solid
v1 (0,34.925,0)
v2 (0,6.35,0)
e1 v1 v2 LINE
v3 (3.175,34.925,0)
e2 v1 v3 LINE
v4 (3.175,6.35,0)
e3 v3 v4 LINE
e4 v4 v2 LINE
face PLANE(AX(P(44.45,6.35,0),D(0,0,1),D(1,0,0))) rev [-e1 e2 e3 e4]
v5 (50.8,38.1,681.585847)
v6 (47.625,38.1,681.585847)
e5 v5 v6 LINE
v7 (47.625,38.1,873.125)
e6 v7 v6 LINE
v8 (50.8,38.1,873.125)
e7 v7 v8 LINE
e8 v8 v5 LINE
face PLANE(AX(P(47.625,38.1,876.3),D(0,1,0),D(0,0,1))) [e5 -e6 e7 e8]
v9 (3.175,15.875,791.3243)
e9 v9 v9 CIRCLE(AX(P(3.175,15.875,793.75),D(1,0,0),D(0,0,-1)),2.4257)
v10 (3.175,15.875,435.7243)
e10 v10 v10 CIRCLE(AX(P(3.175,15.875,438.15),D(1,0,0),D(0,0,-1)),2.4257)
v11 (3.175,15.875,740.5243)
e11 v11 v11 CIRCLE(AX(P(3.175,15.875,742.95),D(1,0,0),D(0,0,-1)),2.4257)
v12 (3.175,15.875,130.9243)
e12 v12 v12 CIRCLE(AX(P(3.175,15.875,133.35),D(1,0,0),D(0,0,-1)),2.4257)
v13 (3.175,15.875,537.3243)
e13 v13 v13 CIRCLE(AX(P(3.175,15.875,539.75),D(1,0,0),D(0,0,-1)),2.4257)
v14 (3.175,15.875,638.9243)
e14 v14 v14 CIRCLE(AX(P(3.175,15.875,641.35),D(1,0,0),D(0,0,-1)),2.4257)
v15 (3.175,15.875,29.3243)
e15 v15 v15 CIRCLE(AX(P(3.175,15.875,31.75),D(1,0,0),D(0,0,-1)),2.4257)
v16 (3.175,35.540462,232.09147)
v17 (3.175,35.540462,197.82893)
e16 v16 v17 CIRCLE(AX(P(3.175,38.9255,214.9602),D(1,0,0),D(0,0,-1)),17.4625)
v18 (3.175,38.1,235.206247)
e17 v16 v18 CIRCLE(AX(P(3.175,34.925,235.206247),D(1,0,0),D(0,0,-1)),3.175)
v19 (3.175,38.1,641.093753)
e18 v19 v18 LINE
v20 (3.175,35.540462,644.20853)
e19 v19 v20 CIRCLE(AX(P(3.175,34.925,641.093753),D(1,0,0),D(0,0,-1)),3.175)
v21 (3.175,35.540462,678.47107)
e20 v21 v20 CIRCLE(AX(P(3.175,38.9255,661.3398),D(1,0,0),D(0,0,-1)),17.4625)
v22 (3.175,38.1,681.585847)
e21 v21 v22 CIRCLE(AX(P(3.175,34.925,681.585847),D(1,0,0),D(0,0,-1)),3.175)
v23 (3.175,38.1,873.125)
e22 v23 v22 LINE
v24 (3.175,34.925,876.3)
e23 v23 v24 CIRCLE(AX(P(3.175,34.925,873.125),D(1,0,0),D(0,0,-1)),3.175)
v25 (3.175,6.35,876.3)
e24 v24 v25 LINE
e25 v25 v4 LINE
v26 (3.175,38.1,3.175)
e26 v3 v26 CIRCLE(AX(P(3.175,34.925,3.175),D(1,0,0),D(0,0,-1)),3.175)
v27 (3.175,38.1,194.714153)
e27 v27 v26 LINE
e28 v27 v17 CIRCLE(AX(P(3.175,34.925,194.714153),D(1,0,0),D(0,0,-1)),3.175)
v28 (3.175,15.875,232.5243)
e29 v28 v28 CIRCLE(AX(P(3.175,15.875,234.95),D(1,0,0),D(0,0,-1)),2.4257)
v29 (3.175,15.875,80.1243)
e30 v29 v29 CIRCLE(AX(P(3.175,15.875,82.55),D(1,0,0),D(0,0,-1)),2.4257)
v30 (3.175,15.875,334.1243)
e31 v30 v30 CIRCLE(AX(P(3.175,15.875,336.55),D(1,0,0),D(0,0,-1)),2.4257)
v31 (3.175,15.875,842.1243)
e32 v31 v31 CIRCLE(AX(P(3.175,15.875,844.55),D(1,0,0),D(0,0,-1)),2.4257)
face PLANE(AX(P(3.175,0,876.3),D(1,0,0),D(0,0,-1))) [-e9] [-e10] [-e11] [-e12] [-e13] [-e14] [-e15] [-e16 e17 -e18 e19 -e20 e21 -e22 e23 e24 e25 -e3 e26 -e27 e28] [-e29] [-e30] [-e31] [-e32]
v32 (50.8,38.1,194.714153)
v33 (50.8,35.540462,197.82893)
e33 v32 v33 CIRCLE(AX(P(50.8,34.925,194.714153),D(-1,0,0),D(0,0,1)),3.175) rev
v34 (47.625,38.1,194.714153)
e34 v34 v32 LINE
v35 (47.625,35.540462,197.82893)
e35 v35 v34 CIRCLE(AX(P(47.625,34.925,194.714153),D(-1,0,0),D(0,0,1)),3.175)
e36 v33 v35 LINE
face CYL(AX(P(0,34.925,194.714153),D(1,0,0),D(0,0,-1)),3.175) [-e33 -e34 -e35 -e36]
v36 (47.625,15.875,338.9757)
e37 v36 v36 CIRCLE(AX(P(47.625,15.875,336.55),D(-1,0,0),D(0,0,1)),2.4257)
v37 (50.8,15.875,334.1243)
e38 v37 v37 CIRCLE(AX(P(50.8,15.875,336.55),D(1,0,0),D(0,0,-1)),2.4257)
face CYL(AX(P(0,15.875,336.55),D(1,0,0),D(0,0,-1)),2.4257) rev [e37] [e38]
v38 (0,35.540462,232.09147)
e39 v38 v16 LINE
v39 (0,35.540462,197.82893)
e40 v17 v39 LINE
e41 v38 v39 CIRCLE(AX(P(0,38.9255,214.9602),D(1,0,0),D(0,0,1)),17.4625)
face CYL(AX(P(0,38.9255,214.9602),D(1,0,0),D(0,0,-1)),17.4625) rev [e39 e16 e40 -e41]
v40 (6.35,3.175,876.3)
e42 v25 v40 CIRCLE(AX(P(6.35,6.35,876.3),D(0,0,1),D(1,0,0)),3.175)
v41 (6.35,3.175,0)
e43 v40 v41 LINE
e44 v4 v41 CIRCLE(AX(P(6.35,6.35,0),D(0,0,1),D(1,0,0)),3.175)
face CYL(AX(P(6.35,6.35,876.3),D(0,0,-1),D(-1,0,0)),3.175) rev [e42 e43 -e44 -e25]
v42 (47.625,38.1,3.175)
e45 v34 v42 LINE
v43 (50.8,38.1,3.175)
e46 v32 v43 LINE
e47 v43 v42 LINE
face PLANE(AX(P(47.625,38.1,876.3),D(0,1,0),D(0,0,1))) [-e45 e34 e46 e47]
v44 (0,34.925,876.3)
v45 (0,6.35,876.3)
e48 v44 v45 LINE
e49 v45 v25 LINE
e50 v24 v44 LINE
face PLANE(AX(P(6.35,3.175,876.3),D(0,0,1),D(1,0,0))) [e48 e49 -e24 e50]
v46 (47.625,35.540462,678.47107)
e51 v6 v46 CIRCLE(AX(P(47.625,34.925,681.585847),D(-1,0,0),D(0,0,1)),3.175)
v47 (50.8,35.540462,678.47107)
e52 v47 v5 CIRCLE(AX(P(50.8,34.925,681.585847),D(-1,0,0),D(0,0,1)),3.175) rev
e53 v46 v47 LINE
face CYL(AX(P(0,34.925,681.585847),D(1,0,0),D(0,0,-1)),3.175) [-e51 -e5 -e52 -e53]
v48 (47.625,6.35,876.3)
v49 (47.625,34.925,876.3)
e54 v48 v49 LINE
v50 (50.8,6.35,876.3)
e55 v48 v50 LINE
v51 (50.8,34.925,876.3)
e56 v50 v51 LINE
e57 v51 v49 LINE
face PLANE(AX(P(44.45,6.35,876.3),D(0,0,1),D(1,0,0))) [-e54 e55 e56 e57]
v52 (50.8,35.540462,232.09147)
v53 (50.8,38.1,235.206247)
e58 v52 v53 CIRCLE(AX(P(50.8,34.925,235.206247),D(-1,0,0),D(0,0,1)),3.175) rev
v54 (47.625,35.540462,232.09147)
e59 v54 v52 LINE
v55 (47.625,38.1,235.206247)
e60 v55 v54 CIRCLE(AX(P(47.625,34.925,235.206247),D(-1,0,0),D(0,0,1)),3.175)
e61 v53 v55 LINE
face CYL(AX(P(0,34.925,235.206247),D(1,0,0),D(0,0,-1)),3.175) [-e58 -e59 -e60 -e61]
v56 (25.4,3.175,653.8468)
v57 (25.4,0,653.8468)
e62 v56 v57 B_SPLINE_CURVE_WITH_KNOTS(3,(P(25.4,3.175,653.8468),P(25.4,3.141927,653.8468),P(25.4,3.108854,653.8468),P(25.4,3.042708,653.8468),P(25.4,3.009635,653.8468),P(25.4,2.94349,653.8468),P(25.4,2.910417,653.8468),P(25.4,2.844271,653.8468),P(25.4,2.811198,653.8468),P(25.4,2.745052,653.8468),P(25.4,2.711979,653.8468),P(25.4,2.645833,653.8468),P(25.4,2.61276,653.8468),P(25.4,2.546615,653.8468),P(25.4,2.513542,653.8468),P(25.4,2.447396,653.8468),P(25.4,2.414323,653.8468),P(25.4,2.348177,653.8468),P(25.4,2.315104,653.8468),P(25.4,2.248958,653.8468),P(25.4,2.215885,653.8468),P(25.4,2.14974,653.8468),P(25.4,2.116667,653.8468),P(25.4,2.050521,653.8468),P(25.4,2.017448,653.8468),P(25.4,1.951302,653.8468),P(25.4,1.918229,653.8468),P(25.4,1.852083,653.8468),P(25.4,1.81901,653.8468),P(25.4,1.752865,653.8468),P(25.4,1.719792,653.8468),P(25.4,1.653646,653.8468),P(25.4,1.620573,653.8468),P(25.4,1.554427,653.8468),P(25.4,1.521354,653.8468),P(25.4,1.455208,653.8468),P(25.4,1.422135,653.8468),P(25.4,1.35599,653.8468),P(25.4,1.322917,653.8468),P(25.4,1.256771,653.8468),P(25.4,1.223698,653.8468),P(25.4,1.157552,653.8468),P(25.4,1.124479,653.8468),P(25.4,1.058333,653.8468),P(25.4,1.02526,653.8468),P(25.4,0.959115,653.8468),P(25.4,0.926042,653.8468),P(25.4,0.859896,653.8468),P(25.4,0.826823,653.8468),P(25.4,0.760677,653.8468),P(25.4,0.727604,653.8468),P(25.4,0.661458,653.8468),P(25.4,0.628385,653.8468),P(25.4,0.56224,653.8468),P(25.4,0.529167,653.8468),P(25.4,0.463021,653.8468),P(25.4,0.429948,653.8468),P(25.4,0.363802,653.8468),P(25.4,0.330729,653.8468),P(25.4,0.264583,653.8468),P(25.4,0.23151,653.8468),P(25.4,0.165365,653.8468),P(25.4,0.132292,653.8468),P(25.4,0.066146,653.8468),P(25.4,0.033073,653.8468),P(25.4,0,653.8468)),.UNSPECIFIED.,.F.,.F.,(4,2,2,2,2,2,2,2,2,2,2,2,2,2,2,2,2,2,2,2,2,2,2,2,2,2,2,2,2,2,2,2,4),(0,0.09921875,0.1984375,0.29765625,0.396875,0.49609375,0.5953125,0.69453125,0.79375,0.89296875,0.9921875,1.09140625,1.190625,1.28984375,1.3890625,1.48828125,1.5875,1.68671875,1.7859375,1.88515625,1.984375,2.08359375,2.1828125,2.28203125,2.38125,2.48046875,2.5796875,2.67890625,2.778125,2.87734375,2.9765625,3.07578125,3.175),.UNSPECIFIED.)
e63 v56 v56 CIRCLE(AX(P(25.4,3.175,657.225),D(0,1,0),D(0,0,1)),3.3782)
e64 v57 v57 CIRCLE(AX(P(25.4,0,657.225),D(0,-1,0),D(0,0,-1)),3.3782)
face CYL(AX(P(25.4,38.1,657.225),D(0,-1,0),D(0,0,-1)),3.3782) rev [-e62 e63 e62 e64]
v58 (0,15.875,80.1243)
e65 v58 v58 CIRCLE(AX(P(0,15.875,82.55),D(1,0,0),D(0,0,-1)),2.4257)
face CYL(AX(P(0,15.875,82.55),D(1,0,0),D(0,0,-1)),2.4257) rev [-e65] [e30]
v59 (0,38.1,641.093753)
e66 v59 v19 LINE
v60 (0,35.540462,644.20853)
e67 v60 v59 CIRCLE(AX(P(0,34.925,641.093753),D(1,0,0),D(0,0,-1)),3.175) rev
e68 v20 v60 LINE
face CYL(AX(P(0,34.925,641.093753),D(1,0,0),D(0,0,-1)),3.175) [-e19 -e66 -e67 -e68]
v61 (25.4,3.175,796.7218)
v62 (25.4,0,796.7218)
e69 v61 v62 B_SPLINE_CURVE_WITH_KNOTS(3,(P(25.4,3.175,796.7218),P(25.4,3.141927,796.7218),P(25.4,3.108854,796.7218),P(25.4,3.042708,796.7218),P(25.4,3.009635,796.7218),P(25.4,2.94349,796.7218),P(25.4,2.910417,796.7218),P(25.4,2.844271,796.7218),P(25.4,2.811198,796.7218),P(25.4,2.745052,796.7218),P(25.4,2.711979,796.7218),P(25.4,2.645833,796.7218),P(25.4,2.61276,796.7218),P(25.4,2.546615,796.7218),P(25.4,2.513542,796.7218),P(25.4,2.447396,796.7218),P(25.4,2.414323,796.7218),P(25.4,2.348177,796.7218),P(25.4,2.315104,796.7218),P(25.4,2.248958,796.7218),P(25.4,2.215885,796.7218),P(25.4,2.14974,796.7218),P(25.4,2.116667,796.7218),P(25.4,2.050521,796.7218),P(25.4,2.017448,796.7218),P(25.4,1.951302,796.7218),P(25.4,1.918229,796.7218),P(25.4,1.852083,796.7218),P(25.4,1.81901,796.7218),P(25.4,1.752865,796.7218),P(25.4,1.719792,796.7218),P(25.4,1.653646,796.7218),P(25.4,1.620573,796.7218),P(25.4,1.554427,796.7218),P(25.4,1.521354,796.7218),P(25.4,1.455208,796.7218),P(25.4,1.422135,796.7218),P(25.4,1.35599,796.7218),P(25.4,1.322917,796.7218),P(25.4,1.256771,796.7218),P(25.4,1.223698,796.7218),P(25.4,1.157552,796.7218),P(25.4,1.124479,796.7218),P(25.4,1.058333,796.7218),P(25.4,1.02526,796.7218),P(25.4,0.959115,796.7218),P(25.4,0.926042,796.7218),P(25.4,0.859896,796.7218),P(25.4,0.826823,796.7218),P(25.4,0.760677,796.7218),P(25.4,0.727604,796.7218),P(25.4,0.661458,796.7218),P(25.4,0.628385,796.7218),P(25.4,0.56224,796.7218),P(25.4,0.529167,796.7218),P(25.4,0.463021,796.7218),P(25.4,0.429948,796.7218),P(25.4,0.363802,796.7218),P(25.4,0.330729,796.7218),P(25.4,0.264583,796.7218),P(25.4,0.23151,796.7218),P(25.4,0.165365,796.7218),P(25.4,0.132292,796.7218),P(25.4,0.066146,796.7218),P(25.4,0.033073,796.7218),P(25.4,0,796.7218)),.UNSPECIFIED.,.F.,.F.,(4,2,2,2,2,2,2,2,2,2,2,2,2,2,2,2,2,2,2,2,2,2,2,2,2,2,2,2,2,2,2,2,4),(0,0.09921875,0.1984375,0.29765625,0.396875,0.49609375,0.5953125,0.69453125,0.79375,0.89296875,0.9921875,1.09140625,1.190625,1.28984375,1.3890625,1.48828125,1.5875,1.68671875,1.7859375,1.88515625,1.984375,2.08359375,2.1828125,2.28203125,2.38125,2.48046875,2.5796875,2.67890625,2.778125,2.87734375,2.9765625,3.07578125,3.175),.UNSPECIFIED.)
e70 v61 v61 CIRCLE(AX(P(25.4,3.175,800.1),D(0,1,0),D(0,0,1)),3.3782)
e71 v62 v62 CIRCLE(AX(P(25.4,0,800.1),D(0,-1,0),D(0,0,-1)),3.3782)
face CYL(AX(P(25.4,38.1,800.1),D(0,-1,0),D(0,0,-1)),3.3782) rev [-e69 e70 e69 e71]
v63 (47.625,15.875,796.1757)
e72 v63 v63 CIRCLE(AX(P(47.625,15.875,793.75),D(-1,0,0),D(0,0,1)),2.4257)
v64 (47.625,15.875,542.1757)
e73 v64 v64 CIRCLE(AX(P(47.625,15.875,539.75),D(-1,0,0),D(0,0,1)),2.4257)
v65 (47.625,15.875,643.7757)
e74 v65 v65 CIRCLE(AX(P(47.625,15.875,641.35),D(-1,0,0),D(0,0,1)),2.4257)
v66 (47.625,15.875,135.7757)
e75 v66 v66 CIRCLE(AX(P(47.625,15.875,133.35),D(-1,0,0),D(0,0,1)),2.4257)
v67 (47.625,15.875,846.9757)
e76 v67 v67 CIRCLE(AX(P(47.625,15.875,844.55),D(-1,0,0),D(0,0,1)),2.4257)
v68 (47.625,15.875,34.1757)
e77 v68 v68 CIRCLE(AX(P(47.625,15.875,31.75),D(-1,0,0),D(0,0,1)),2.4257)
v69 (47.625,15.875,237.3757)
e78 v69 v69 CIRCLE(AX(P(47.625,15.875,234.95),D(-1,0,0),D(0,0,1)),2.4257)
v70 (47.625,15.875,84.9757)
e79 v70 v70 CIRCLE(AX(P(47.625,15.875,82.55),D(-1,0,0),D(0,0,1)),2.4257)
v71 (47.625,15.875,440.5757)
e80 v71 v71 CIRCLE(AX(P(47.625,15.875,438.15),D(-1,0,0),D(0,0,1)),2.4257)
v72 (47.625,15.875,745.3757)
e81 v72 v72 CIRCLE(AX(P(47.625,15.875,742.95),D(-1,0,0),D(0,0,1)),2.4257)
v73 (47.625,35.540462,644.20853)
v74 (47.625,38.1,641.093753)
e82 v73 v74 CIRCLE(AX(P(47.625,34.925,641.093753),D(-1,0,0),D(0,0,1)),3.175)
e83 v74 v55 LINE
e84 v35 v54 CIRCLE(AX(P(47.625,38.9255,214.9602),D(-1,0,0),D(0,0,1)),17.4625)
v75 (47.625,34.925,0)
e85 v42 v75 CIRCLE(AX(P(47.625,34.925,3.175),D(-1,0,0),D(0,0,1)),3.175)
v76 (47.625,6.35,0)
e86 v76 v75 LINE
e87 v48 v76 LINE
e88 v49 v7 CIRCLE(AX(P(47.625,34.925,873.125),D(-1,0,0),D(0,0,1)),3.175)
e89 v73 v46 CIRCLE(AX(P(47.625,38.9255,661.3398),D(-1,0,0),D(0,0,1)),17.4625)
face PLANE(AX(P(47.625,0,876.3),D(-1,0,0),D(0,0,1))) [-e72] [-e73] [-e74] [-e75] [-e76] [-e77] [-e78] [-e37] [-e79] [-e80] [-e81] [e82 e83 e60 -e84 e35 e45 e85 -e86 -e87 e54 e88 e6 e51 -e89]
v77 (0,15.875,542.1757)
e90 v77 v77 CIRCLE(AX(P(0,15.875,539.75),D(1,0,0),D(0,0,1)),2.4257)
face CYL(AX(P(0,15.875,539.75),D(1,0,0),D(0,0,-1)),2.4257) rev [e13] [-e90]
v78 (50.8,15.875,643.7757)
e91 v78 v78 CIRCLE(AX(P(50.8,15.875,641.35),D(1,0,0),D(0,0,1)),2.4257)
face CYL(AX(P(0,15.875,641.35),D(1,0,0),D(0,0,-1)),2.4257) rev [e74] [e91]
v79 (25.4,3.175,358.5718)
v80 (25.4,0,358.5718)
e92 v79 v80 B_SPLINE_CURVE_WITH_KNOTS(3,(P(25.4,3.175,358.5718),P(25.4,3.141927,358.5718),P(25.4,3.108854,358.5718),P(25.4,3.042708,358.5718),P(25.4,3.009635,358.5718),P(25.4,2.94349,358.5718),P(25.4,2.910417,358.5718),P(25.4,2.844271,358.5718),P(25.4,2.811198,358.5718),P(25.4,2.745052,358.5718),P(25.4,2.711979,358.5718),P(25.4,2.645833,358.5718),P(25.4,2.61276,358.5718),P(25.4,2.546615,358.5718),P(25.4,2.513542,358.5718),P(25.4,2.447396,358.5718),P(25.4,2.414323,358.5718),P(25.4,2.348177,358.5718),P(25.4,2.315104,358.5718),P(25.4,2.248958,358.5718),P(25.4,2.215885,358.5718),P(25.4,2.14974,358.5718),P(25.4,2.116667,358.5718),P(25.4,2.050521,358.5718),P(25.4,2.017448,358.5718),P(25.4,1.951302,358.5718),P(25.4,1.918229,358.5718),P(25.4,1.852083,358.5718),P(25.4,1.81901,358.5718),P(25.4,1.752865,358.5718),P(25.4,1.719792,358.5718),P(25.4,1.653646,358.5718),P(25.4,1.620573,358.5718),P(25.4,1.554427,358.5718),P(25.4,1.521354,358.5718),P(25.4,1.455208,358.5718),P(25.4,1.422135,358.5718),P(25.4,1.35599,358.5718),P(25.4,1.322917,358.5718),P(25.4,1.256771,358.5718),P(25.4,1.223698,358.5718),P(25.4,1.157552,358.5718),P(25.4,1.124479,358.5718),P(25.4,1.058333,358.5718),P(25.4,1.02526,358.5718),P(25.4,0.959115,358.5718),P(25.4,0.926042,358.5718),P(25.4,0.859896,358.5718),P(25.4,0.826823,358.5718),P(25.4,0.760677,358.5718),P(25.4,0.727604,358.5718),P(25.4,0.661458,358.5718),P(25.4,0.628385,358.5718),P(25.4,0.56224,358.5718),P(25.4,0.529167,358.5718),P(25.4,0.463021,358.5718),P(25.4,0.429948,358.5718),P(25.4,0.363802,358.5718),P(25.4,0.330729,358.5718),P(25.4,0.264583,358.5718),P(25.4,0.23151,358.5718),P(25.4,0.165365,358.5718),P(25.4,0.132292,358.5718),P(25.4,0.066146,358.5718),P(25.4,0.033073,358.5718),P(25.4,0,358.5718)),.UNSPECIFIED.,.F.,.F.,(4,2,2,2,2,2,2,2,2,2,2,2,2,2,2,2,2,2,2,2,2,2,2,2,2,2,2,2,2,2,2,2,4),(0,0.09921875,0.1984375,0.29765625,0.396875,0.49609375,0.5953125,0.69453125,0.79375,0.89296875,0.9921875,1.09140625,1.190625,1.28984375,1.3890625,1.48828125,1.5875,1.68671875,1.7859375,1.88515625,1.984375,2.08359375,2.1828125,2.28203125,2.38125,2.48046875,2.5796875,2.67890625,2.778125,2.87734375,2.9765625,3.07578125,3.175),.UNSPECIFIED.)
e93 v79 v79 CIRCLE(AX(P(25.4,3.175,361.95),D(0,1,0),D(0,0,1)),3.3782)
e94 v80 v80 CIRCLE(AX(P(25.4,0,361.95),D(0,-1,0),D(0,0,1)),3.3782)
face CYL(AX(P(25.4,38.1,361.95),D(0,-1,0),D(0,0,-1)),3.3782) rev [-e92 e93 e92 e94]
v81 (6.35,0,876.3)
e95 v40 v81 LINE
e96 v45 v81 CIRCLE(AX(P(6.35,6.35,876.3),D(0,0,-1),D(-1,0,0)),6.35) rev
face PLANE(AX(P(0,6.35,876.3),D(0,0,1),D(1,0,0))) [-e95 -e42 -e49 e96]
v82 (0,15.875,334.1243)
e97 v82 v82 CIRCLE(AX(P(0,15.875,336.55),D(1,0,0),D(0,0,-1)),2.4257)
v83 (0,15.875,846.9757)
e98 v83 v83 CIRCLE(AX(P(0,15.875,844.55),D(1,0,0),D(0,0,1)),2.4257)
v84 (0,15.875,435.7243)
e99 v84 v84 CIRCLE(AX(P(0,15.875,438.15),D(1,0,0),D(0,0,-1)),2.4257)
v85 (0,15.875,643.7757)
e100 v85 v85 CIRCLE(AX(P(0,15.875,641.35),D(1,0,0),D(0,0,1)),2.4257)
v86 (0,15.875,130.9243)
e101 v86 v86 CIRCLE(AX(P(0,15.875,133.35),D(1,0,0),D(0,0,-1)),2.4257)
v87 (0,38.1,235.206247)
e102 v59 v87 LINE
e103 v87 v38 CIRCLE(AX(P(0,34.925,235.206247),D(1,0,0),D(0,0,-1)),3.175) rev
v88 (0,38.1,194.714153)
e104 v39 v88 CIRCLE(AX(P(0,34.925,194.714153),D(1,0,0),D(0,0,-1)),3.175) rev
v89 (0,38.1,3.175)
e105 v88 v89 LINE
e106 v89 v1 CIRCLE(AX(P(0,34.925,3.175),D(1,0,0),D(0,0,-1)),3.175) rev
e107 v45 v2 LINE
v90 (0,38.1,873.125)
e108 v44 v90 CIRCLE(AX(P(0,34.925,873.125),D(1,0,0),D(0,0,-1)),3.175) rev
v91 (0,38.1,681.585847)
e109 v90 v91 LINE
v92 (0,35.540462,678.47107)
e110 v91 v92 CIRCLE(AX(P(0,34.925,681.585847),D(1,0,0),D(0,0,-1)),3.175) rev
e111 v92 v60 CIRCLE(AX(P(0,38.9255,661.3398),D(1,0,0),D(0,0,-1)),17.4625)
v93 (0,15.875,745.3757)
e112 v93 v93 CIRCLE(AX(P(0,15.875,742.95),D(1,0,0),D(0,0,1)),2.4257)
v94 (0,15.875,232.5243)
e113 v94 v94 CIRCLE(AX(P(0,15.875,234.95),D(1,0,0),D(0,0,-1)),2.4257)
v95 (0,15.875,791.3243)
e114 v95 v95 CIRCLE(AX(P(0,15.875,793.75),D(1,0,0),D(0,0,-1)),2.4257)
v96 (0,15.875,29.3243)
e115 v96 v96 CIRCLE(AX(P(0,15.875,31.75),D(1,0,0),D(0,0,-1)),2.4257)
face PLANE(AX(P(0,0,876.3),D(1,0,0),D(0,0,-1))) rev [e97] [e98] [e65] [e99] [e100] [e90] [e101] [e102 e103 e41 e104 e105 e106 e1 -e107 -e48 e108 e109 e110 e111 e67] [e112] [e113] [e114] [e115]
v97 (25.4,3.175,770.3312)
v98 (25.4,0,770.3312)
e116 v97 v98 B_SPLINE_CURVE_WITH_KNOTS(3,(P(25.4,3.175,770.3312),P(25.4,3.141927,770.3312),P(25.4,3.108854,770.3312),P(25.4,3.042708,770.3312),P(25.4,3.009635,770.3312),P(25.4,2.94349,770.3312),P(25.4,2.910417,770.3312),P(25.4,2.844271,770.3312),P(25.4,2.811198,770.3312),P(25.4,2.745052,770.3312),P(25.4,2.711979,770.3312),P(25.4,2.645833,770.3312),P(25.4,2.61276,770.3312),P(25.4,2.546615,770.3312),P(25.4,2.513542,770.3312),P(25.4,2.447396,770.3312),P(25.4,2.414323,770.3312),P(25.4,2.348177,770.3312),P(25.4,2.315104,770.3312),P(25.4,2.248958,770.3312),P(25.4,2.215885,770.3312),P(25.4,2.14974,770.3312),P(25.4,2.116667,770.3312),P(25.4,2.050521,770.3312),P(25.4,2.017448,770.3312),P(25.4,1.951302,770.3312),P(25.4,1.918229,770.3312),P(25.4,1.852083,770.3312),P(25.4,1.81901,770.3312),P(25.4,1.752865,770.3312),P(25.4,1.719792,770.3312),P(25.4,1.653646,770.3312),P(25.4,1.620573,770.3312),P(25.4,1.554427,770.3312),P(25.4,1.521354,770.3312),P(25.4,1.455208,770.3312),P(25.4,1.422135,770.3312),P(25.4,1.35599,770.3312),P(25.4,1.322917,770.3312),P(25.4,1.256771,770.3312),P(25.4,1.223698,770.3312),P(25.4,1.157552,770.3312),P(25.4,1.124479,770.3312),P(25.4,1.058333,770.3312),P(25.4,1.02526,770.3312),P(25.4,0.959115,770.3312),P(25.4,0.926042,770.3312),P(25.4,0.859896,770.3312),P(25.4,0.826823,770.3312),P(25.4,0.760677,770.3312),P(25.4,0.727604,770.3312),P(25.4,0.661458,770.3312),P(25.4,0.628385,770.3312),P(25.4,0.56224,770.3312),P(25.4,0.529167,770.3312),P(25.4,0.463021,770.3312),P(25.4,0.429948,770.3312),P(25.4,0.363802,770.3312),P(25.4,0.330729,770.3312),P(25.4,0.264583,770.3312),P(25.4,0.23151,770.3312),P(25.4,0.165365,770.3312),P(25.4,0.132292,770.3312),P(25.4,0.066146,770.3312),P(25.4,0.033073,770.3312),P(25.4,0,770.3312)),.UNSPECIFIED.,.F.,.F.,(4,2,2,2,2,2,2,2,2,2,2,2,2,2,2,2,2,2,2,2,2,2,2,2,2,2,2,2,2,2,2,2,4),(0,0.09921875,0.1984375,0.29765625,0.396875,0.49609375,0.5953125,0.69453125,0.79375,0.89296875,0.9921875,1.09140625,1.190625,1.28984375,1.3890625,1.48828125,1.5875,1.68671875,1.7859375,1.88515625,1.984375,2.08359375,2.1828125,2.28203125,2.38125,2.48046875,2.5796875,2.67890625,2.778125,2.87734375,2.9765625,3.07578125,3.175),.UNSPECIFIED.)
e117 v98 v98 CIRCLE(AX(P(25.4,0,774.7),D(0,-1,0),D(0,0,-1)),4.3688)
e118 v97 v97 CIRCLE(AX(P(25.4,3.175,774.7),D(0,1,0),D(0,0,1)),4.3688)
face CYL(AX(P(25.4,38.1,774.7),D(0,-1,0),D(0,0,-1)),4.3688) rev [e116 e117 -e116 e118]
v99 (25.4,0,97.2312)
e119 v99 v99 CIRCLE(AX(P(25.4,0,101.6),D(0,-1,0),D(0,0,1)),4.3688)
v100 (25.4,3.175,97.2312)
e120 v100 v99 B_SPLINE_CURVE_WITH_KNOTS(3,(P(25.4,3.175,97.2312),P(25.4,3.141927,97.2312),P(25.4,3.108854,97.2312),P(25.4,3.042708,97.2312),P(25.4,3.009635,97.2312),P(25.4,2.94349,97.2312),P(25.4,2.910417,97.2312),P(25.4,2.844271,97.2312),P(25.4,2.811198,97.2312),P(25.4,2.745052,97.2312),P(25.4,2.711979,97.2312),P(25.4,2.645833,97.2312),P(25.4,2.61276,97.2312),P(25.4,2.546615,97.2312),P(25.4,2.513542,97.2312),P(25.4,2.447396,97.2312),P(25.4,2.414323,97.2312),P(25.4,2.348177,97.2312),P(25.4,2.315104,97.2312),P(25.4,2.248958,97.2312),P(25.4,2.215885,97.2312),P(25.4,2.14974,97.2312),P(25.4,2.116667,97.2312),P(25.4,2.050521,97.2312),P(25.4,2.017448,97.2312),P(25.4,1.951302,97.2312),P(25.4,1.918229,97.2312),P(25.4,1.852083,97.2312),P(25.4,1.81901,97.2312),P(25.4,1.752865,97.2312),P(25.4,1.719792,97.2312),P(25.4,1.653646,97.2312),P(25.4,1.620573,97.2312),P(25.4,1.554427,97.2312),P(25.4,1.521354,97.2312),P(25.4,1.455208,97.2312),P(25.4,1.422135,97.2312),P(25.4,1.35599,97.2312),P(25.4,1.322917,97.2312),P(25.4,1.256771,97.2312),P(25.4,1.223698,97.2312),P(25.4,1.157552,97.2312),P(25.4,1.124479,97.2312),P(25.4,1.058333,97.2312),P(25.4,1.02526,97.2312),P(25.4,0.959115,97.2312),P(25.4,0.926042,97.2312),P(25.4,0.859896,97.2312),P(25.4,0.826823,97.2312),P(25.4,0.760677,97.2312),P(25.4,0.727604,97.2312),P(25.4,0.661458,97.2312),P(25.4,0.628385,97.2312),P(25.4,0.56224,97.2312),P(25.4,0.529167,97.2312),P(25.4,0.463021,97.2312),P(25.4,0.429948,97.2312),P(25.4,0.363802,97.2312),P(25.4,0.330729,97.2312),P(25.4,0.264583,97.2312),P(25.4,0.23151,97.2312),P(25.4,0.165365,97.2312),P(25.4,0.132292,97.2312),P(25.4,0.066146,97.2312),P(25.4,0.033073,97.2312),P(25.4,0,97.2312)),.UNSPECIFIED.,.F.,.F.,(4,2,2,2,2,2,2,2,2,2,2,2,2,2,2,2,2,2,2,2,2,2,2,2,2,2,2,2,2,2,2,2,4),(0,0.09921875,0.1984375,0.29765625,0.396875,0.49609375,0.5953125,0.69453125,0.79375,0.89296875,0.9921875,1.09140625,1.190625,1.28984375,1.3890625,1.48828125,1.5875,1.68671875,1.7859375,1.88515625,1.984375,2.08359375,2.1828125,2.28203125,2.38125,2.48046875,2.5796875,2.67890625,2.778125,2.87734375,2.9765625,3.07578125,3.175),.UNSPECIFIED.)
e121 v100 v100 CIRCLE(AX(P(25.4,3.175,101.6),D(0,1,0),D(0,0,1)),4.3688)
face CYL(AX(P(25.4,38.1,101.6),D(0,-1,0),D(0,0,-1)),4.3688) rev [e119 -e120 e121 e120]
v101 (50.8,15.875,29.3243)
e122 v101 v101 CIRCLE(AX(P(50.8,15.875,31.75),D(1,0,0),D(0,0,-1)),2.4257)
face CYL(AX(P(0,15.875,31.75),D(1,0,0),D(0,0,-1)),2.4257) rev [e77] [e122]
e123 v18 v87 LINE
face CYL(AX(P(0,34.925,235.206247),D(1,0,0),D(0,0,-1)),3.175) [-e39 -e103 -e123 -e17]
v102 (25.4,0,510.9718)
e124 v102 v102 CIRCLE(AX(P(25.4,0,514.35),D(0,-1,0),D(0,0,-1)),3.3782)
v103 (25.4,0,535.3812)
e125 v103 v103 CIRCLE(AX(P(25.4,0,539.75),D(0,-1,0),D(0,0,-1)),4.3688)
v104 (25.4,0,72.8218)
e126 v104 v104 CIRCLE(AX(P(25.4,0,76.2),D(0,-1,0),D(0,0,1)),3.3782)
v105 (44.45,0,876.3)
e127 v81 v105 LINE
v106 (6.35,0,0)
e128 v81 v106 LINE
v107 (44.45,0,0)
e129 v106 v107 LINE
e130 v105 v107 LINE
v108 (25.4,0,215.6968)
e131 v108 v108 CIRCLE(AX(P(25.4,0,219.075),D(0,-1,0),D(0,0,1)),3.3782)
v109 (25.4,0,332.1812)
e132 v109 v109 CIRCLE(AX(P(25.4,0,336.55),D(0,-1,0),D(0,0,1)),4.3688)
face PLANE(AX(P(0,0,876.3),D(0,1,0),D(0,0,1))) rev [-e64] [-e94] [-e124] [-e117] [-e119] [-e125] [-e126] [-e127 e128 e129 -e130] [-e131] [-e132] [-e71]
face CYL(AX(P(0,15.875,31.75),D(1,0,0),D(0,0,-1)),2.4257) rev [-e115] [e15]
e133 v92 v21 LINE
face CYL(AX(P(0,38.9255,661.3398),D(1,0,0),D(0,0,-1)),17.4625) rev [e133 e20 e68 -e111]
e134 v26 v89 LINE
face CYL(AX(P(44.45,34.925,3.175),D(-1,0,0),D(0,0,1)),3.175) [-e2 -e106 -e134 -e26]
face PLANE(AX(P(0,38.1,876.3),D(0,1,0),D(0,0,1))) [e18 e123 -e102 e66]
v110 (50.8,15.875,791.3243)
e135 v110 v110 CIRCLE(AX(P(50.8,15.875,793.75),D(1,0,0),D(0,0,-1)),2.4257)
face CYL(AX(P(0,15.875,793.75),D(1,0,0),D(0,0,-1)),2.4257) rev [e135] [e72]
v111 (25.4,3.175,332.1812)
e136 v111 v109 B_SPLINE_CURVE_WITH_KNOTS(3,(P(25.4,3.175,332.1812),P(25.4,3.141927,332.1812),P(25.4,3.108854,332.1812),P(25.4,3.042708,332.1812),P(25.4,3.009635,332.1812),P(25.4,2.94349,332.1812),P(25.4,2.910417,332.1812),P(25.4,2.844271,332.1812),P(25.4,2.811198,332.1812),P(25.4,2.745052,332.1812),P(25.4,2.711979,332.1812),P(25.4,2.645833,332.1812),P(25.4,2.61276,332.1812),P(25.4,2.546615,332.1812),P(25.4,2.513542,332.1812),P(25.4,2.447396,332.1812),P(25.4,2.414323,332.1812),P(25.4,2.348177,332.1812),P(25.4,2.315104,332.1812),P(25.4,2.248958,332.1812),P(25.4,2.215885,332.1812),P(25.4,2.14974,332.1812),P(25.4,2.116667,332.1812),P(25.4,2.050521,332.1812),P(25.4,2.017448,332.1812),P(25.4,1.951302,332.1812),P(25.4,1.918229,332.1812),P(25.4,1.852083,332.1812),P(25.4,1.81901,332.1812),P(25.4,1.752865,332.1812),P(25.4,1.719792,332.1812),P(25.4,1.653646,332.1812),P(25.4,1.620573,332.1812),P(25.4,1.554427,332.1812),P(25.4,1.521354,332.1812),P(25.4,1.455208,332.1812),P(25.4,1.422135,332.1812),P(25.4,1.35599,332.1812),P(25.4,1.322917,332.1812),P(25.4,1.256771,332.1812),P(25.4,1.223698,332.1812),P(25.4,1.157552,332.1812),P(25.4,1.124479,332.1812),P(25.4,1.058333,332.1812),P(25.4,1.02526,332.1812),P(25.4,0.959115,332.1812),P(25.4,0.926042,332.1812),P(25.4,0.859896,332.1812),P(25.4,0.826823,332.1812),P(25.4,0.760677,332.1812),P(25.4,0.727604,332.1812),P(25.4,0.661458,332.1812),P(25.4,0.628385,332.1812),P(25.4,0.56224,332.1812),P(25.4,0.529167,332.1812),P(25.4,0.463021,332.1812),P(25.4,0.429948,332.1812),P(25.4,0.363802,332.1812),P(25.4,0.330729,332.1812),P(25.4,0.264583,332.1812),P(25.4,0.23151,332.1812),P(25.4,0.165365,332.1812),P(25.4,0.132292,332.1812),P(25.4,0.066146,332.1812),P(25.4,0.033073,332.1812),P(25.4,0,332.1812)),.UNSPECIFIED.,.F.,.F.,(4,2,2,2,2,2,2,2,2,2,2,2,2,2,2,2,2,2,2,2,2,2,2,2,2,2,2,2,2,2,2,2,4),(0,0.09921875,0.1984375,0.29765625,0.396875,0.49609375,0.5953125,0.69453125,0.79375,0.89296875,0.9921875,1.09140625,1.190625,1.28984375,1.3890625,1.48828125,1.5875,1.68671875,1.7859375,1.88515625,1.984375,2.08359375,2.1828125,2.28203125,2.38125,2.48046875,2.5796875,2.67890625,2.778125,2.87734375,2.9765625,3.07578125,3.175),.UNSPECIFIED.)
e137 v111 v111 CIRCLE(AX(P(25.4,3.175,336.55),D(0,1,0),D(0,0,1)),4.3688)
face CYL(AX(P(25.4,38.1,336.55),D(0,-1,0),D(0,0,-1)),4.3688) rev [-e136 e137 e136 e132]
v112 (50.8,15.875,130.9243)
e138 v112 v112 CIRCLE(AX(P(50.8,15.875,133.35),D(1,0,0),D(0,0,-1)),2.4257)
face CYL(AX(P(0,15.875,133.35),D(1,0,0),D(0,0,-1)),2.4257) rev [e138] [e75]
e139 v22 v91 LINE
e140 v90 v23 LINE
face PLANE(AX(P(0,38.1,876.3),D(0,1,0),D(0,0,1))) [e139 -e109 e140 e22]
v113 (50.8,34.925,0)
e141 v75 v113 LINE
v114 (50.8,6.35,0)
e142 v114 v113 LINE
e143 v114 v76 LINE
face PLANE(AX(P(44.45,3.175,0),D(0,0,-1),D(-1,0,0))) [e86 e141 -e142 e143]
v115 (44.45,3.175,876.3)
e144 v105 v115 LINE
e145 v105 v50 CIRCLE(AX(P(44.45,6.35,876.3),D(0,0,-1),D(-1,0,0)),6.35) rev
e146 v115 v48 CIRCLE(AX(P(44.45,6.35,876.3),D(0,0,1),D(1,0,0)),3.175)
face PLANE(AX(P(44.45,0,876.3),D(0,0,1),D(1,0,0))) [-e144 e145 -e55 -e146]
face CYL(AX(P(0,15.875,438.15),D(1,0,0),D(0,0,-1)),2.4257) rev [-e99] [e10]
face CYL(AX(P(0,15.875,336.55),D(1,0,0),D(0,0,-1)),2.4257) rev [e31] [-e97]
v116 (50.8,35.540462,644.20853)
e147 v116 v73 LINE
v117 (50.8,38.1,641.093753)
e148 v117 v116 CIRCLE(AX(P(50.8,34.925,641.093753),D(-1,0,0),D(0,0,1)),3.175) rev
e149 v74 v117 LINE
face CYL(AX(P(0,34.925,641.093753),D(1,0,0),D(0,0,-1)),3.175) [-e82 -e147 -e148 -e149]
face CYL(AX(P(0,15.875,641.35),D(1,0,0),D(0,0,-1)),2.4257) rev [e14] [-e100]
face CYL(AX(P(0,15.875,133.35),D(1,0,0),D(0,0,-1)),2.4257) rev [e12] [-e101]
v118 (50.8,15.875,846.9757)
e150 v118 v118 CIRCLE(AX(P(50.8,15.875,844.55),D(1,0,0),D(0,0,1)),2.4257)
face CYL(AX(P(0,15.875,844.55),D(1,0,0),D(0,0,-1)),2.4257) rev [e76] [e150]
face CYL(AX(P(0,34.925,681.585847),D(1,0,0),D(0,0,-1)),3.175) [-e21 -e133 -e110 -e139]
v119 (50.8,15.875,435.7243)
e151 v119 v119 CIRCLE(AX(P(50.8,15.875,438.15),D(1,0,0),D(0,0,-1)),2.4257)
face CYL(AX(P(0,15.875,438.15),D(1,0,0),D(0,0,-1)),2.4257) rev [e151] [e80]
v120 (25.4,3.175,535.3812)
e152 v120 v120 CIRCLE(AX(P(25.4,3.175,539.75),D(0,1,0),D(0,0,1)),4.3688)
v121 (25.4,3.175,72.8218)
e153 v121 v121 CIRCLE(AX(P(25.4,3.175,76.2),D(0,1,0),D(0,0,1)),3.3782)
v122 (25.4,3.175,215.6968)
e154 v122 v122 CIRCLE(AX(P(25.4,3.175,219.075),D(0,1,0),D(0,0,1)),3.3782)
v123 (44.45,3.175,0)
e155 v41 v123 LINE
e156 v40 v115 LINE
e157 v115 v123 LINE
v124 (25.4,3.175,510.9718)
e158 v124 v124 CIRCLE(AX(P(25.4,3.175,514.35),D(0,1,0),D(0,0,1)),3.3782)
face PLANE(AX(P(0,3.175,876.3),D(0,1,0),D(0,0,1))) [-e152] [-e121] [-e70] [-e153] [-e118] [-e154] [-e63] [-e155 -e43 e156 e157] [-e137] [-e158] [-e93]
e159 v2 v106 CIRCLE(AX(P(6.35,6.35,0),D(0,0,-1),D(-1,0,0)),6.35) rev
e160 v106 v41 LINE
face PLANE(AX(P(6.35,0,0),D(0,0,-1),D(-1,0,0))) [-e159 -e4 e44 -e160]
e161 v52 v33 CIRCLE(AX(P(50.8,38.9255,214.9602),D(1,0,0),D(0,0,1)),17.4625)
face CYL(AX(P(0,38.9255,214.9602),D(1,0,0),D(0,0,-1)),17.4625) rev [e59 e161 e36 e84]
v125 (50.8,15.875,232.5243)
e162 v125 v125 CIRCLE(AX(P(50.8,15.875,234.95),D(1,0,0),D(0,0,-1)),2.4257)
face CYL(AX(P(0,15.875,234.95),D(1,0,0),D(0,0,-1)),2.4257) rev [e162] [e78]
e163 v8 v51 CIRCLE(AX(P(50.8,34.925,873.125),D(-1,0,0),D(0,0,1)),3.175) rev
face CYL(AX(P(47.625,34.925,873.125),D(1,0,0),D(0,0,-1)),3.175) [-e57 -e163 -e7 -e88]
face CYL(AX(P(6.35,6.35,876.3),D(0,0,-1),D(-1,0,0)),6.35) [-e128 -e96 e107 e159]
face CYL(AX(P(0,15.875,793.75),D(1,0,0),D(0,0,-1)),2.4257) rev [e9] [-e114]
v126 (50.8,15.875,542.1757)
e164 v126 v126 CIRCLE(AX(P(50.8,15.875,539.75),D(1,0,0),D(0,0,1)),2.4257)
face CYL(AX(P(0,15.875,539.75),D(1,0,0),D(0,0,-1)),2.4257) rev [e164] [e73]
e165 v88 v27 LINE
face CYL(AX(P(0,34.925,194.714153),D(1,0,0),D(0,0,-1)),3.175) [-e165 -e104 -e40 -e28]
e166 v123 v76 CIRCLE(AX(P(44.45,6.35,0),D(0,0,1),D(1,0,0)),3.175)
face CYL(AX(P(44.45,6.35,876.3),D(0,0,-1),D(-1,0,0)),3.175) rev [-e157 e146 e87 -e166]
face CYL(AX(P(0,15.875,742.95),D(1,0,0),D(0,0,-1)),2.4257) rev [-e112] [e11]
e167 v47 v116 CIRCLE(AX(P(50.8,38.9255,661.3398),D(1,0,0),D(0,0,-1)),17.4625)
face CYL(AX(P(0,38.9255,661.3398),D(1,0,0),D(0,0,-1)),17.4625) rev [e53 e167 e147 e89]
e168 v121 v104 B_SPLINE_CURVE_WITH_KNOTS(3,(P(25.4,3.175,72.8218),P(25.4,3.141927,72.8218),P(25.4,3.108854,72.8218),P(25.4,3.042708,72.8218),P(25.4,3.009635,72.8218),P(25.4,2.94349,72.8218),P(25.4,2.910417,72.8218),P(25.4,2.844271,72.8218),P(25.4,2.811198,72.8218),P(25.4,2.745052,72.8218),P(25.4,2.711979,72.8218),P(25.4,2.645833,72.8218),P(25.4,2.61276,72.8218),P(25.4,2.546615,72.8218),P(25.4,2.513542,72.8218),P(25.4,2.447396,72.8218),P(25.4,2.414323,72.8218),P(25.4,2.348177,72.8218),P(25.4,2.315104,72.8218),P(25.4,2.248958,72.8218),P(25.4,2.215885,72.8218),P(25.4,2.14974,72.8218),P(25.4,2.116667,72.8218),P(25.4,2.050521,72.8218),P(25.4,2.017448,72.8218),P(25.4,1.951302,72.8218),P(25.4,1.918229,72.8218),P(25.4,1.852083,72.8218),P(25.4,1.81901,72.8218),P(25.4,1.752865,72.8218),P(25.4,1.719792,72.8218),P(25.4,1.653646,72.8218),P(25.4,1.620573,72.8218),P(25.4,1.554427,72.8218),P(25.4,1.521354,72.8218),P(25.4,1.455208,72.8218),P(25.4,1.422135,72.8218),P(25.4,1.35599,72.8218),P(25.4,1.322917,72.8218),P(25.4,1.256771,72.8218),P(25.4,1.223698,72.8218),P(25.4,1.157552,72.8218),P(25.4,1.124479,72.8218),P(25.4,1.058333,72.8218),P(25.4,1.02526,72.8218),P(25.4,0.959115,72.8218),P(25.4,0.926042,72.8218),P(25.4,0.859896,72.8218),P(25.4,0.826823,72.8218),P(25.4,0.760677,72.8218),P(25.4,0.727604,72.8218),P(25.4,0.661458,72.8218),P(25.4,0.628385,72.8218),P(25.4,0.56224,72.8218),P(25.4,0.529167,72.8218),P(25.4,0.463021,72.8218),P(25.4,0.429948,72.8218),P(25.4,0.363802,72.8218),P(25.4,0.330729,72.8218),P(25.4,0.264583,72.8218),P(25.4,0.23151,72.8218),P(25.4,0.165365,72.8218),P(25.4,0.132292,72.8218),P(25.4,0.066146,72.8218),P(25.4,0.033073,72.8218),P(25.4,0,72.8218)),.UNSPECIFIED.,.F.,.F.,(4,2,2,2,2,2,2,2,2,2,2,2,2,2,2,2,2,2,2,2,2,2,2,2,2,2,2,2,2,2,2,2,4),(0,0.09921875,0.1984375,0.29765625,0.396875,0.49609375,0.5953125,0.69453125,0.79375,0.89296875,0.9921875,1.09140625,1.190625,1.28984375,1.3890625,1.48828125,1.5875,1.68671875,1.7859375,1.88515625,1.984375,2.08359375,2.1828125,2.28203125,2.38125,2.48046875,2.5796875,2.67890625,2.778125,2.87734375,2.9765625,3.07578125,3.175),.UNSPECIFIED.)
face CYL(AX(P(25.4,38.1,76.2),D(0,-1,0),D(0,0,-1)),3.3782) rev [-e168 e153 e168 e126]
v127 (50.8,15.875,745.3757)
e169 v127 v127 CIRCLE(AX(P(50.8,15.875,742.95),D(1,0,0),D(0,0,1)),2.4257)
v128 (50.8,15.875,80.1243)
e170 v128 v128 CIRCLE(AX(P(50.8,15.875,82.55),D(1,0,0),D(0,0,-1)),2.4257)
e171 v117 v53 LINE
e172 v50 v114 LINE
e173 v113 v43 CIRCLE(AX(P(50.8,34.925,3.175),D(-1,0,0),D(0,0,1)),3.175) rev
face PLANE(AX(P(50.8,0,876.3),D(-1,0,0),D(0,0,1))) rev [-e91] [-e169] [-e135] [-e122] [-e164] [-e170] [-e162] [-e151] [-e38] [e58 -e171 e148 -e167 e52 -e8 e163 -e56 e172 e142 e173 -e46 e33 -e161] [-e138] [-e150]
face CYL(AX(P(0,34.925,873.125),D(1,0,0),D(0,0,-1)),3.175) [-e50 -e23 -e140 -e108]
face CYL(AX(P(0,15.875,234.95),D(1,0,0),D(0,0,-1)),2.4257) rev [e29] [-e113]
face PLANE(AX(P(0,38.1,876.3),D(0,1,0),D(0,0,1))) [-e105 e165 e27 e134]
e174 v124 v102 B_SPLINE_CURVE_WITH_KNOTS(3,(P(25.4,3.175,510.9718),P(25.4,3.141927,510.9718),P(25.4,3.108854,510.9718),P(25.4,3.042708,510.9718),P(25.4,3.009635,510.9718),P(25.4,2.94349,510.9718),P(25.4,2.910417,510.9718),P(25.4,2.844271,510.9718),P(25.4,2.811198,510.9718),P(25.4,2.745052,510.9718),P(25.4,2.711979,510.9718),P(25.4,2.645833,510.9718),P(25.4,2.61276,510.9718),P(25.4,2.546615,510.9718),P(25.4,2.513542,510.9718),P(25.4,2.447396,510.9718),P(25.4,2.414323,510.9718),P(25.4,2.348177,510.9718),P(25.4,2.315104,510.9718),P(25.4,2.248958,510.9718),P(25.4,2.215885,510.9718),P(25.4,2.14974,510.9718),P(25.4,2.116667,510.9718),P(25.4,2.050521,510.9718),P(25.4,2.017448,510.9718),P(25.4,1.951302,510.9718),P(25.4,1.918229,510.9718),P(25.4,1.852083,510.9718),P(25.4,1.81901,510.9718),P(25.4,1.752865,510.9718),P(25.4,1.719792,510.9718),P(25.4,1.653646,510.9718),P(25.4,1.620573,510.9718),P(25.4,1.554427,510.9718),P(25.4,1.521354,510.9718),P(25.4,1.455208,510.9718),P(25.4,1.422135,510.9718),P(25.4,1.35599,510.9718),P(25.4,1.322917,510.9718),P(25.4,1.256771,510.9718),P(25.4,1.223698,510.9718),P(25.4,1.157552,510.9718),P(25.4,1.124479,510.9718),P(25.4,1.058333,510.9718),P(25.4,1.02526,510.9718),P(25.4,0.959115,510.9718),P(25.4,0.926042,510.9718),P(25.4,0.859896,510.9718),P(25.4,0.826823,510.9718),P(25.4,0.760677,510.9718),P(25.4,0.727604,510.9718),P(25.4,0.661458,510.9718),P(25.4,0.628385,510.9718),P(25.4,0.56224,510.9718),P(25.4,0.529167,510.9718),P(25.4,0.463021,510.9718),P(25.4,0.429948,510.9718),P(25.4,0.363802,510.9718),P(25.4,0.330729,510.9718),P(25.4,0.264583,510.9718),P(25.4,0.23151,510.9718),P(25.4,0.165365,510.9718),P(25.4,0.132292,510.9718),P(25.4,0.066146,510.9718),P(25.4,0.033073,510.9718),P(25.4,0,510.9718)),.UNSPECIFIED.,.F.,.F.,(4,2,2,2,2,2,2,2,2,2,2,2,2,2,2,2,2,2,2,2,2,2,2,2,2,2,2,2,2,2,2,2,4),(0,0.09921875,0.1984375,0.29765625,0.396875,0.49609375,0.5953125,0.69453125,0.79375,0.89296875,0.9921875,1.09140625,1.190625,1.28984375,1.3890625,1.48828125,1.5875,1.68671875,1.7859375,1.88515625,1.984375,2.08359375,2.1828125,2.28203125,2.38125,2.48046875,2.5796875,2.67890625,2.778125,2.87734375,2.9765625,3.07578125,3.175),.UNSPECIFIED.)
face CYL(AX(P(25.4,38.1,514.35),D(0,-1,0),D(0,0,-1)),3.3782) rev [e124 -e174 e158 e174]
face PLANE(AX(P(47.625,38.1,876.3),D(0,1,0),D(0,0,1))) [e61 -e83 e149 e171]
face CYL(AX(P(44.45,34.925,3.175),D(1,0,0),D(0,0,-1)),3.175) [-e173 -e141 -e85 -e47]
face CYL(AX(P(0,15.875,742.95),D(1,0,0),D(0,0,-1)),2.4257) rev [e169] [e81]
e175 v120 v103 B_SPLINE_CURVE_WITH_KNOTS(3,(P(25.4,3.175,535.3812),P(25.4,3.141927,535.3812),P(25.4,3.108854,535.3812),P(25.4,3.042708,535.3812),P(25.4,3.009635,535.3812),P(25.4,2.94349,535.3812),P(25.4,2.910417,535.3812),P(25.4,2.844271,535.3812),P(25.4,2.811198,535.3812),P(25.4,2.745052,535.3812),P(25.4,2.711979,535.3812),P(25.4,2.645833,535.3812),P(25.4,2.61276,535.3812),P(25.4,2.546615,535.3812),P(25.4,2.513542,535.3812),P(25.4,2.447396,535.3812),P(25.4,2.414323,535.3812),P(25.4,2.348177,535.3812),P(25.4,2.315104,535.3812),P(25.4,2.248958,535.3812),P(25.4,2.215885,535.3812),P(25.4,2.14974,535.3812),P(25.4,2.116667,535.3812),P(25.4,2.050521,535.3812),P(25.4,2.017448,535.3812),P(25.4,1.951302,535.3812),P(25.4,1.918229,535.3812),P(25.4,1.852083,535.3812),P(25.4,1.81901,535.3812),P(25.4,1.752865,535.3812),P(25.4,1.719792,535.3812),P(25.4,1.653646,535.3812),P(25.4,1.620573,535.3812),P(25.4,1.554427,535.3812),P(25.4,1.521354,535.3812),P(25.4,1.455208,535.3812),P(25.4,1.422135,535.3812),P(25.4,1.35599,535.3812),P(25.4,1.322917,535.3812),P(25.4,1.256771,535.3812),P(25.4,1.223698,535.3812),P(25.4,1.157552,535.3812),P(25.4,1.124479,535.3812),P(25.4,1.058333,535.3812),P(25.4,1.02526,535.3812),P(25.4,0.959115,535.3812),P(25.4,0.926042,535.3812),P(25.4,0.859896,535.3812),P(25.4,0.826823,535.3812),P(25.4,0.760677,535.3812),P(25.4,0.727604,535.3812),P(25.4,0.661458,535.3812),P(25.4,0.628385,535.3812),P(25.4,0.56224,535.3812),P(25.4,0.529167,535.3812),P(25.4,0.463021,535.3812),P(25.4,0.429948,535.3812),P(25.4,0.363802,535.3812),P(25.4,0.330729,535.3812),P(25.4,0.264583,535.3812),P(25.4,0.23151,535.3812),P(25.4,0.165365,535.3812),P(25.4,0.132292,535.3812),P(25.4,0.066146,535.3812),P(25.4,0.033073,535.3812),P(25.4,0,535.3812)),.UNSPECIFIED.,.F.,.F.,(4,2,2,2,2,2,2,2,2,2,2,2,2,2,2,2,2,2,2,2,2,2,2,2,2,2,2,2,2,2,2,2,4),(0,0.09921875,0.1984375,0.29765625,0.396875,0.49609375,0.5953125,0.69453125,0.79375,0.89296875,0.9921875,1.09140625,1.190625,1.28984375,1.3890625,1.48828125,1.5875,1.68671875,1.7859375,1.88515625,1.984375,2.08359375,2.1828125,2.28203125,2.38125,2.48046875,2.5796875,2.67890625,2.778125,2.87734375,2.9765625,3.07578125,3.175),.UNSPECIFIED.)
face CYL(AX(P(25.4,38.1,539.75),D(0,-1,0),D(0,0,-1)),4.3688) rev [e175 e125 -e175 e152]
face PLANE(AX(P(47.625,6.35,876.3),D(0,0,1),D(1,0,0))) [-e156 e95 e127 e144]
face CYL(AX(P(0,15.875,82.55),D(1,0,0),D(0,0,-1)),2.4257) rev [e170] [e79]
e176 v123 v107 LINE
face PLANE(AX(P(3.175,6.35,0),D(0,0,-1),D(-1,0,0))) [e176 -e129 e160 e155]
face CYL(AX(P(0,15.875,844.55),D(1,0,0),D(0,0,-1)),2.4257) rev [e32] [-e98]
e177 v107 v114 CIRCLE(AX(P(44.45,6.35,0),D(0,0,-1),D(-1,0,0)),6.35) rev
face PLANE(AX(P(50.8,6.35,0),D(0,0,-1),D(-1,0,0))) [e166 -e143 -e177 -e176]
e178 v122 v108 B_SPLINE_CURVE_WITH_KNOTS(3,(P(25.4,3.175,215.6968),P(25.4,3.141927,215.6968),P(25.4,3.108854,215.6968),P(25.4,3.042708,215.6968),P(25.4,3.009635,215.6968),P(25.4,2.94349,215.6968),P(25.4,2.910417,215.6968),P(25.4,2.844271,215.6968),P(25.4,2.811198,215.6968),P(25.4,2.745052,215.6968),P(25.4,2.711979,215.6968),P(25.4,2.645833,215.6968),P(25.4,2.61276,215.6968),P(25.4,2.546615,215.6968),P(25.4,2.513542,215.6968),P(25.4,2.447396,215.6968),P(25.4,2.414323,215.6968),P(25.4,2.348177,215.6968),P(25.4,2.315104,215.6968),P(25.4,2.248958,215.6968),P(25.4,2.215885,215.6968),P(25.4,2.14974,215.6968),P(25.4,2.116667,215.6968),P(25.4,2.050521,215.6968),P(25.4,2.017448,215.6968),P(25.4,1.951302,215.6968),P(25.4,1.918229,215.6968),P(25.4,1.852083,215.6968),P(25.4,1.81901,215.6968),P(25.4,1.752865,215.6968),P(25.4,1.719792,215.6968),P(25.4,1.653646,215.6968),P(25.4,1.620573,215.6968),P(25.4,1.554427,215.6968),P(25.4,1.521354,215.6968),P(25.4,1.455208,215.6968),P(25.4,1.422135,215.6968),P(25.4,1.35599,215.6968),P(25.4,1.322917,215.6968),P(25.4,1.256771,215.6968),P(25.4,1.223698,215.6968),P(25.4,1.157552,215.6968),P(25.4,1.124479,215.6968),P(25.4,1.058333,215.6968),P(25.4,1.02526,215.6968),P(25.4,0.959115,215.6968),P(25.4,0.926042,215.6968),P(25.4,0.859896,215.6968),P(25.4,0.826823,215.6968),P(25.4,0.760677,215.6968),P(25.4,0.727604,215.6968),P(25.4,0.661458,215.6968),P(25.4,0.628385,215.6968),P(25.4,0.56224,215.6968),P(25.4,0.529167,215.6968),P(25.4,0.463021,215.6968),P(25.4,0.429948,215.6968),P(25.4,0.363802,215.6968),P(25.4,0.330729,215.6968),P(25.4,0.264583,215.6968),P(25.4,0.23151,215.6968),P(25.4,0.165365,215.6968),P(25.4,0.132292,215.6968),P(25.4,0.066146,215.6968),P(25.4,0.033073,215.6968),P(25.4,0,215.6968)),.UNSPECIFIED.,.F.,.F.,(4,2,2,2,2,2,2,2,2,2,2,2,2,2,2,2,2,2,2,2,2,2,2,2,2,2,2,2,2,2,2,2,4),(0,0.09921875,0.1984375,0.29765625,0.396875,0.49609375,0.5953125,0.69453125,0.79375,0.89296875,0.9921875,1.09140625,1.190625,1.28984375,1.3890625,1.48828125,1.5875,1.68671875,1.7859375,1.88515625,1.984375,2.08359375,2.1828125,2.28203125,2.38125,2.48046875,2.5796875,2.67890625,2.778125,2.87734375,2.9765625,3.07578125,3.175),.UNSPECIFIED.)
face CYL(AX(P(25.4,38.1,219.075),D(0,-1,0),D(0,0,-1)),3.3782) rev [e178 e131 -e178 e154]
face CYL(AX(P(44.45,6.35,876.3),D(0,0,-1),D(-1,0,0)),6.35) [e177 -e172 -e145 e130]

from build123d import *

# Parameters (mm, degrees)
BASE_FLANGE1_DEPTH = 876.3
SKETCH6_R          = 2.4257
SKETCH6_R_2        = 17.4625
CUT_EXTRUDE1_DEPTH = 879.597712267
FILLET1_R          = 3.175
SKETCH8_R          = 3.3782
SKETCH8_R_2        = 4.3688
CUT_EXTRUDE2_DEPTH = 879.597712267


# Sheet-metal steps are written as plain solids
with BuildPart() as part:
    # Sketch1 → Base-Flange1 (new body)
    with BuildSketch(Plane.XY):
        with BuildLine():
            Line((50.8, 38.1), (50.8, 6.35))
            ThreePointArc((50.8, 6.35), (48.940128061, 1.859871939), (44.45, 0))
            Line((44.45, 0), (6.35, 0))
            ThreePointArc((6.35, 0), (1.859871939, 1.859871939), (0, 6.35))
            Line((0, 6.35), (0, 38.1))
            Line((0, 38.1), (3.175, 38.1))
            Line((3.175, 38.1), (3.175, 6.35))
            ThreePointArc((3.175, 6.35), (4.10493597, 4.10493597), (6.35, 3.175))
            Line((6.35, 3.175), (44.45, 3.175))
            ThreePointArc((44.45, 3.175), (46.69506403, 4.10493597), (47.625, 6.35))
            Line((47.625, 6.35), (47.625, 38.1))
            Line((47.625, 38.1), (50.8, 38.1))
        make_face()
    extrude(amount=BASE_FLANGE1_DEPTH)

    # Sketch6 → Cut-Extrude1 (cut, through all)
    with BuildSketch(Plane(origin=(50.8, 0, 0), x_dir=(0, 0, -1), z_dir=(1, 0, 0))):
        with Locations((-438.15, 15.875)):
            Circle(SKETCH6_R)
        with Locations((-336.55, 15.875)):
            Circle(SKETCH6_R)
        with Locations((-234.95, 15.875)):
            Circle(SKETCH6_R)
        with Locations((-133.35, 15.875)):
            Circle(SKETCH6_R)
        with Locations((-31.75, 15.875)):
            Circle(SKETCH6_R)
        with Locations((-844.55, 15.875)):
            Circle(SKETCH6_R)
        with Locations((-742.95, 15.875)):
            Circle(SKETCH6_R)
        with Locations((-641.35, 15.875)):
            Circle(SKETCH6_R)
        with Locations((-539.75, 15.875)):
            Circle(SKETCH6_R)
        with Locations((-661.3398, 38.9255)):
            Circle(SKETCH6_R_2)
        with Locations((-214.9602, 38.9255)):
            Circle(SKETCH6_R_2)
        with Locations((-793.75, 15.875)):
            Circle(SKETCH6_R)
        with Locations((-82.55, 15.875)):
            Circle(SKETCH6_R)
    extrude(amount=-CUT_EXTRUDE1_DEPTH, mode=Mode.SUBTRACT)

    # Fillet1
    fillet1_edges = [part.edges().sort_by_distance(p)[0] for p in [
        (1.5875, 38.1, 0),
        (1.5875, 38.1, 678.782777269),
        (1.5875, 38.1, 643.896822731),
        (49.2125, 38.1, 678.782777269),
        (49.2125, 38.1, 643.896822731),
        (1.5875, 38.1, 232.403177269),
        (1.5875, 38.1, 197.517222731),
        (49.2125, 38.1, 232.403177269),
        (49.2125, 38.1, 197.517222731),
        (49.2125, 38.1, 0),
        (1.5875, 38.1, 876.3),
        (49.2125, 38.1, 876.3),
    ]]
    fillet(fillet1_edges, radius=FILLET1_R)

    # Sketch8 → Cut-Extrude2 (cut, through all)
    with BuildSketch(Plane.XZ):
        with Locations(Location((25.4, 800.1, 0), (0, 0, 270))):
            Circle(SKETCH8_R)
        with Locations(Location((25.4, 774.7, 0), (0, 0, 270))):
            Circle(SKETCH8_R_2)
        with Locations(Location((25.4, 657.225, 0), (0, 0, 270))):
            Circle(SKETCH8_R)
        with Locations(Location((25.4, 514.35, 0), (0, 0, 270))):
            Circle(SKETCH8_R)
        with Locations(Location((25.4, 539.75, 0), (0, 0, 270))):
            Circle(SKETCH8_R_2)
        with Locations(Location((25.4, 336.55, 0), (0, 0, 270))):
            Circle(SKETCH8_R_2)
        with Locations(Location((25.4, 361.95, 0), (0, 0, 270))):
            Circle(SKETCH8_R)
        with Locations(Location((25.4, 219.075, 0), (0, 0, 270))):
            Circle(SKETCH8_R)
        with Locations(Location((25.4, 101.6, 0), (0, 0, 270))):
            Circle(SKETCH8_R_2)
        with Locations(Location((25.4, 76.2, 0), (0, 0, 270))):
            Circle(SKETCH8_R)
    extrude(amount=-CUT_EXTRUDE2_DEPTH, mode=Mode.SUBTRACT)


solid = part.part
